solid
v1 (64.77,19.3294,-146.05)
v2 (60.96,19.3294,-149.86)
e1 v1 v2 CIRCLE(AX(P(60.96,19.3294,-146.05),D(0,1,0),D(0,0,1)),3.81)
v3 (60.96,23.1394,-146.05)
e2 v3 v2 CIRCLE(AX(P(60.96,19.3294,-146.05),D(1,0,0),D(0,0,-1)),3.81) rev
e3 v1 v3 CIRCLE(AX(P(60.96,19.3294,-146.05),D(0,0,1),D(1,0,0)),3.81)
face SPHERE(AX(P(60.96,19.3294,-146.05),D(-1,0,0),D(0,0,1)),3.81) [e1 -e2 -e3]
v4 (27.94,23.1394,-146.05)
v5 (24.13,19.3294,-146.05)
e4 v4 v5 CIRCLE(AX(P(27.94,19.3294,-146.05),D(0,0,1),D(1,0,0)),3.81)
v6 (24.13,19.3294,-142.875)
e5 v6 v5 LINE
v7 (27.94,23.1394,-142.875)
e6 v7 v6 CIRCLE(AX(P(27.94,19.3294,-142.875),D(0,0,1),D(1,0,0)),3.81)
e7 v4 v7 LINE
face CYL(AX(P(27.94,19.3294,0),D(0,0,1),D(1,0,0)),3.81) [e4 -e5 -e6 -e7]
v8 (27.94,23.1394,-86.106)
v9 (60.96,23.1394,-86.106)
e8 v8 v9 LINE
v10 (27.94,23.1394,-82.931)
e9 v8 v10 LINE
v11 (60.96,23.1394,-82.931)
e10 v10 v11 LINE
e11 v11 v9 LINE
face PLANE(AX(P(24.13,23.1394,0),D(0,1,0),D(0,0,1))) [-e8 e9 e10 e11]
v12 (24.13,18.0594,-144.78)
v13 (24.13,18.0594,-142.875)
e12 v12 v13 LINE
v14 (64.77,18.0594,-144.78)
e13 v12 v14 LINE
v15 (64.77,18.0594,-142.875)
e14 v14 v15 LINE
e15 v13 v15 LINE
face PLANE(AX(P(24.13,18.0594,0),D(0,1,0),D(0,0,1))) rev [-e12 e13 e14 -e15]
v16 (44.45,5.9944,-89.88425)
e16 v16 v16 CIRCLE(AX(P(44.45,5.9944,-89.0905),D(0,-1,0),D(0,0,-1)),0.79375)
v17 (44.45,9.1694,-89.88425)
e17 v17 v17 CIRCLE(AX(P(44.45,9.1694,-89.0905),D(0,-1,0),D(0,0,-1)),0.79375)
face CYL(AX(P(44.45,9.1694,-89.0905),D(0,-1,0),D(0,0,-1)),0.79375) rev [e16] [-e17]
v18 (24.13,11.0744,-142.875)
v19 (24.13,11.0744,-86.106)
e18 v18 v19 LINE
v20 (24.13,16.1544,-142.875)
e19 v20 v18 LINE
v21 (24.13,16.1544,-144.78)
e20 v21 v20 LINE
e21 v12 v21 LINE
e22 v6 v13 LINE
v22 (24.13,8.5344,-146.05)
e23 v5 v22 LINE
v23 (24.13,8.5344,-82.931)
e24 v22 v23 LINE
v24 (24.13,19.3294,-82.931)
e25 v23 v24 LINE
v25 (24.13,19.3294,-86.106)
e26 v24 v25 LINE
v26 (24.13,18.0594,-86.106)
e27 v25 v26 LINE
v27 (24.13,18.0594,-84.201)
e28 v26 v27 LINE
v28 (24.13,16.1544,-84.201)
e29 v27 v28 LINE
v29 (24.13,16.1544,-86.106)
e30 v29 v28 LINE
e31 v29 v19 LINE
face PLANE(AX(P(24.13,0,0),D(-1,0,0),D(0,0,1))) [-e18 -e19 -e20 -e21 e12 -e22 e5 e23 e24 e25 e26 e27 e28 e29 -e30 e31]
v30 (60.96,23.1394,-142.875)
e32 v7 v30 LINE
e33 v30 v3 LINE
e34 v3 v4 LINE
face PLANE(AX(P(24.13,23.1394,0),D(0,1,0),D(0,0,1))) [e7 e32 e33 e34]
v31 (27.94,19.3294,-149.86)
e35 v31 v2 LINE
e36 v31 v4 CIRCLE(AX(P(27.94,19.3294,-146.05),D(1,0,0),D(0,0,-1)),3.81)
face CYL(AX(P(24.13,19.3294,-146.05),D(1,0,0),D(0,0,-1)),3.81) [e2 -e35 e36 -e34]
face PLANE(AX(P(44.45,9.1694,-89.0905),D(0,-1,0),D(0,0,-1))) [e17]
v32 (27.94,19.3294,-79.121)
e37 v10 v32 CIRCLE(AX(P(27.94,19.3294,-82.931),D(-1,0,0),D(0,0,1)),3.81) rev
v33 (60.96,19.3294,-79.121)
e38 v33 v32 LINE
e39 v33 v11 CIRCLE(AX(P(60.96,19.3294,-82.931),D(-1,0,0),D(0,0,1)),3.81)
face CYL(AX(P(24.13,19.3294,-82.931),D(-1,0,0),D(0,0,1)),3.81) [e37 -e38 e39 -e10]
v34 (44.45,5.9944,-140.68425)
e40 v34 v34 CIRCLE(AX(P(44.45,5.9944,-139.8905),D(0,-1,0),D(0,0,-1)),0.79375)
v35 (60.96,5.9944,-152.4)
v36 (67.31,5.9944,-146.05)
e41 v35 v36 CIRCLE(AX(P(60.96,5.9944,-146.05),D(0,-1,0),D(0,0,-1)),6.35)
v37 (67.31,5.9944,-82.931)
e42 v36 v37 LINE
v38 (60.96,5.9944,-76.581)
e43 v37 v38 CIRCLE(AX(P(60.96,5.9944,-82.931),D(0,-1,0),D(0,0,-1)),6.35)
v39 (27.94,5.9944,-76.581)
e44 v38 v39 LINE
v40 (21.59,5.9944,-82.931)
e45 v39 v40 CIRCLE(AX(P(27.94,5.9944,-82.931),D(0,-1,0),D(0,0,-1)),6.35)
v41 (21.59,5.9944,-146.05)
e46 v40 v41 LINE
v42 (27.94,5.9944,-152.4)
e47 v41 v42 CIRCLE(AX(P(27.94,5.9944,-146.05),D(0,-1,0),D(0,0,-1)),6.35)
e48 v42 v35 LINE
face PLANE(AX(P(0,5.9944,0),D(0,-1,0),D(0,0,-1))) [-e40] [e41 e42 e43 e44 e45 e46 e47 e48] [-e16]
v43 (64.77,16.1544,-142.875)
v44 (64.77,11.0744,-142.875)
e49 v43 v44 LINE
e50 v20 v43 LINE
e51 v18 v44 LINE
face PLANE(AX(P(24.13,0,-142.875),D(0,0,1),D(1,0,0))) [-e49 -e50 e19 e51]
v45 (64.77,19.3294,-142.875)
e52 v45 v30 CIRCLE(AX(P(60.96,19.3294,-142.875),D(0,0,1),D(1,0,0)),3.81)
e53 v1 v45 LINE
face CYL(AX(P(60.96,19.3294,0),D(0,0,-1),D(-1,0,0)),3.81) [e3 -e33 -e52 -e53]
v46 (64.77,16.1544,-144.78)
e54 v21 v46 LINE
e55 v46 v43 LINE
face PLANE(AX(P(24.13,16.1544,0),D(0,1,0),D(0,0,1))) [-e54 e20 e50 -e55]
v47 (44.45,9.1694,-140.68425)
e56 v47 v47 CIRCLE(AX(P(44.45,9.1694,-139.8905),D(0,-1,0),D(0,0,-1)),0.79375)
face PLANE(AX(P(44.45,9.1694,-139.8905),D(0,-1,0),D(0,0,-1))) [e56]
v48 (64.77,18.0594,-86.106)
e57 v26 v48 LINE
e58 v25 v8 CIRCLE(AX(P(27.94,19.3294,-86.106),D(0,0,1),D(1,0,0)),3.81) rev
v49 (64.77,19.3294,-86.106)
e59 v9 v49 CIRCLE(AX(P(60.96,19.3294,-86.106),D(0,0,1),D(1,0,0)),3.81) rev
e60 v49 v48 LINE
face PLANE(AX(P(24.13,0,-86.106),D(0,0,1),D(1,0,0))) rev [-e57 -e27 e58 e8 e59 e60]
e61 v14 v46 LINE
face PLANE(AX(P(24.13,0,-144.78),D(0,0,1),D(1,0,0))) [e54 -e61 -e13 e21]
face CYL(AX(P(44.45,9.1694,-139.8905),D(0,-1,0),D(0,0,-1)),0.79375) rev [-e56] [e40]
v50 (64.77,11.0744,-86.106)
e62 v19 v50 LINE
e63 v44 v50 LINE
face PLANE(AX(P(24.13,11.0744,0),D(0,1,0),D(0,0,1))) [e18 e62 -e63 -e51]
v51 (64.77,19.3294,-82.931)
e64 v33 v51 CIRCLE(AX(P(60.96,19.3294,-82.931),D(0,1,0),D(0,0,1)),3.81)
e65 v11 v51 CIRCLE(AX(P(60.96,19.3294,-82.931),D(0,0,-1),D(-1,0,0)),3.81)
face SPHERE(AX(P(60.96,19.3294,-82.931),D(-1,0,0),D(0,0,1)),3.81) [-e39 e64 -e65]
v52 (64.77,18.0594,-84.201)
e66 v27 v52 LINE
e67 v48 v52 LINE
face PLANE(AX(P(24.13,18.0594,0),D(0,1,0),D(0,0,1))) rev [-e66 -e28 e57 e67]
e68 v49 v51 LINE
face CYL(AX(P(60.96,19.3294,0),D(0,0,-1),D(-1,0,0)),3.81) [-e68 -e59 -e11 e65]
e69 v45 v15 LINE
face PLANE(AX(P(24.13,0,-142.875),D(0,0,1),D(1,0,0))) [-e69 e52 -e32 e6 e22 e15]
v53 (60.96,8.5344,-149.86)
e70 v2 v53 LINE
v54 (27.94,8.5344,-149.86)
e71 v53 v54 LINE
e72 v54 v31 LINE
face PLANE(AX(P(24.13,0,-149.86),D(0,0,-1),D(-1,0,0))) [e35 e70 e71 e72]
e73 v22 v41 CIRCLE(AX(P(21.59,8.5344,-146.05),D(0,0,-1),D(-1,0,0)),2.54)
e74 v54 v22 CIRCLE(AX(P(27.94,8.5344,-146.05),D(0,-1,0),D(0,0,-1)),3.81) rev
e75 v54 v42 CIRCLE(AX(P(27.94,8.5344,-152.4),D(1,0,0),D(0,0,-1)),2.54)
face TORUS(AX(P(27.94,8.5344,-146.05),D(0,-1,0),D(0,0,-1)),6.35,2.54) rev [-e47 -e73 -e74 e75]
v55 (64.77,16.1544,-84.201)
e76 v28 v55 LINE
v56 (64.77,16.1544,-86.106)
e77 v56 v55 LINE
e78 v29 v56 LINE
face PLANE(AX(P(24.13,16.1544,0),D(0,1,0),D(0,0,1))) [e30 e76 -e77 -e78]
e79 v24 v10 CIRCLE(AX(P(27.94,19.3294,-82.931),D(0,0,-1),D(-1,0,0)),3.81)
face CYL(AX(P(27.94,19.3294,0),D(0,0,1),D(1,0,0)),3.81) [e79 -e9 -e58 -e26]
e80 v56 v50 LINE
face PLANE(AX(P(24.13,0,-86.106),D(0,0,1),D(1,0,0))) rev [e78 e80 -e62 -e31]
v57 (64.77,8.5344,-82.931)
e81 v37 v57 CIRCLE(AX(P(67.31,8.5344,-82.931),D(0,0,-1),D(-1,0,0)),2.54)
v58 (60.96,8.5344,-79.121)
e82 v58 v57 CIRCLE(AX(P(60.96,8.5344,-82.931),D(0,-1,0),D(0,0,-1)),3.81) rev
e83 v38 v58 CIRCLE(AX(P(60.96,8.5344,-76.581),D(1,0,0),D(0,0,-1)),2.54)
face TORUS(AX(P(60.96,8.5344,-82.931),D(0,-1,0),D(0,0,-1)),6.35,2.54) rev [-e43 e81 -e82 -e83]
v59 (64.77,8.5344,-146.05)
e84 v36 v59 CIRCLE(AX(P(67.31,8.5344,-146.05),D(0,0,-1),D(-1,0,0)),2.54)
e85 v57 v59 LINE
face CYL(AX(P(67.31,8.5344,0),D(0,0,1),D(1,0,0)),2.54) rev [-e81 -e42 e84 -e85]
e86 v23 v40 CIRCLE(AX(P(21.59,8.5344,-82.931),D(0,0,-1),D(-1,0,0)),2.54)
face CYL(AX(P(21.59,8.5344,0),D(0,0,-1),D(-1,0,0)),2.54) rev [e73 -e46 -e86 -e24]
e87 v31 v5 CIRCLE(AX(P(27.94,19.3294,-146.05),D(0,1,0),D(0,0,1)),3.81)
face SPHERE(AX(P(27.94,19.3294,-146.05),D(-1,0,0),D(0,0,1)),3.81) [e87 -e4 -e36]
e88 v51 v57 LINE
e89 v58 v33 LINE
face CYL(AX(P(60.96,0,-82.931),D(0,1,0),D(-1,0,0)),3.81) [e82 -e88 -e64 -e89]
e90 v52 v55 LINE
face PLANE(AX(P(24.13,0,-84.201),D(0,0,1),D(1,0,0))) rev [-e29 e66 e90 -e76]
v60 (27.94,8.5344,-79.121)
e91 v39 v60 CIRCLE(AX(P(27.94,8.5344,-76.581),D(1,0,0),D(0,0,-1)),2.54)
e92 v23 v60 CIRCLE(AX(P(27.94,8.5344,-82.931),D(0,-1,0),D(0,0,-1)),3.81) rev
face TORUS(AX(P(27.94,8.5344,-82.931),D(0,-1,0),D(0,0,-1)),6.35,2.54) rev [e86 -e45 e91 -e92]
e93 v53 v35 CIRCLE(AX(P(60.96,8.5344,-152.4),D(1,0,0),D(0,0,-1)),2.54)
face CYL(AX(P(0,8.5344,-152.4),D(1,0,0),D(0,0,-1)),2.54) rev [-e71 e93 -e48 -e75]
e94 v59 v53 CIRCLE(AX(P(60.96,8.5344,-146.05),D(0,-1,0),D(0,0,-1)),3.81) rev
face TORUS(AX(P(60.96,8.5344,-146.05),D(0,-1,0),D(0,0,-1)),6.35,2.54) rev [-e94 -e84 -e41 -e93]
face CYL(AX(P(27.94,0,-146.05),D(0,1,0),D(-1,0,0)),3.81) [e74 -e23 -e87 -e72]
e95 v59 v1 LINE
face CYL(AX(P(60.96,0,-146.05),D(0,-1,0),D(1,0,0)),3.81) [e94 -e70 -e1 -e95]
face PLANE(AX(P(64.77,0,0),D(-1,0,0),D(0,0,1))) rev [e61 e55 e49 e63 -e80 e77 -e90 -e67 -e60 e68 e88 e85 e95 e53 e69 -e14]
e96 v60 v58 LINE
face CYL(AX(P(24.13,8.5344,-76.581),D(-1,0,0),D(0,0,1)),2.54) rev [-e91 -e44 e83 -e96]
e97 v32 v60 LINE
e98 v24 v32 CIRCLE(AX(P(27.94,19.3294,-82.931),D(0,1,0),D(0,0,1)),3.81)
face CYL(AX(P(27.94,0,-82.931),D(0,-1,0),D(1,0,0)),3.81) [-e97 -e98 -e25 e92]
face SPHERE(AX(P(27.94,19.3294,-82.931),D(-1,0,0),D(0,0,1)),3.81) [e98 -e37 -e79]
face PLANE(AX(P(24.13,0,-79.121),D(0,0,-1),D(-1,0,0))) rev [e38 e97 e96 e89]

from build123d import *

# Parameters (mm, degrees)
SKETCH2_W               = 88.9
SKETCH2_H               = 152.4
BOSS_EXTRUDE1_DEPTH     = 5.9944
CUT_EXTRUDE2_DEPTH      = 177.535840076
CUT_EXTRUDE2_DEPTH_BACK = 177.535840076
SKETCH4_R               = 2.7305
BOSS_EXTRUDE2_DEPTH     = 101.6
FILLET1_R               = 3.81
FILLET2_R               = 2.54
BOSS_EXTRUDE3_DEPTH     = 20.32
FILLET3_R               = 3.81
FILLET6_R               = 3.81
FILLET7_R               = 2.54
CUT_EXTRUDE3_DEPTH      = 204.596488182
CUT_EXTRUDE3_DEPTH_BACK = 204.596488182
SKETCH7_W               = 2.54
SKETCH7_H               = 152.4
SKETCH8_W               = 86.36
SKETCH8_H               = 152.4
CUT_EXTRUDE4_DEPTH      = 5.9944
SKETCH9_R               = 0.79375
CUT_EXTRUDE5_DEPTH      = 3.175


with BuildPart() as part:
    # Sketch2 → Boss-Extrude1 (new body)
    with BuildSketch(Plane(origin=(0, 0, 0), x_dir=(1, 0, 0), z_dir=(0, 1, 0))):
        with Locations((44.45, 76.2)):
            Rectangle(SKETCH2_W, SKETCH2_H)
    extrude(amount=BOSS_EXTRUDE1_DEPTH)

    # Sketch4 → Cut-Extrude2 (cut, two sides: drawn at the far end of the back side and taken through both)
    with BuildSketch(Plane(origin=(0, 5.9944, 0), x_dir=(1, 0, 0), z_dir=(0, 1, 0)).offset(-CUT_EXTRUDE2_DEPTH_BACK)):
        with Locations(Location((45.72, 109.871331367, 0), (0, 0, 270))):
            Circle(SKETCH4_R)
        with Locations(Location((45.72, 33.671331367, 0), (0, 0, 270))):
            Circle(SKETCH4_R)
    extrude(amount=CUT_EXTRUDE2_DEPTH + CUT_EXTRUDE2_DEPTH_BACK, mode=Mode.SUBTRACT)

    # Sketch5 → Boss-Extrude2 (add)
    with BuildSketch(Plane(origin=(0, 5.9944, 0), x_dir=(1, 0, 0), z_dir=(0, 1, 0))):
        Polygon((18.542, 15.748), (12.446, 15.748), (12.446, 2.54), (76.454, 2.54), (76.454, 15.748), (70.358, 15.748), (70.358, 13.208), (71.374, 13.208), (71.374, 11.43), (70.358, 11.43), (70.358, 7.62), (18.542, 7.62), (18.542, 11.43), (17.526, 11.43), (17.526, 13.208), (18.542, 13.208), align=None)
    extrude(amount=BOSS_EXTRUDE2_DEPTH)

    # Fillet1
    fillet1_edges = [part.edges().sort_by_distance(p)[0] for p in [
        (12.446, 56.7944, -15.748),
        (12.446, 56.7944, -2.54),
        (76.454, 56.7944, -2.54),
        (76.454, 56.7944, -15.748),
    ]]
    fillet(fillet1_edges, radius=FILLET1_R)

    # Fillet2
    fillet2_edges = [part.edges().sort_by_distance(p)[0] for p in [
        (71.501, 5.9944, -15.748),
        (44.45, 5.9944, -2.54),
        (12.446, 5.9944, -9.144),
        (17.399, 5.9944, -15.748),
        (76.454, 5.9944, -9.144),
        (13.561923164, 5.9944, -3.655923164),
        (13.561923164, 5.9944, -14.632076836),
        (75.338076836, 5.9944, -3.655923164),
        (75.338076836, 5.9944, -14.632076836),
    ]]
    fillet(fillet2_edges, radius=FILLET2_R - 0.0001)  # a hair under: the kernel refuses the full size

    # Sketch6 → Boss-Extrude3 (add, symmetric)
    with BuildSketch(Plane.ZY.offset(-44.45)):
        Polygon((-149.86, 5.9944), (-79.121, 5.9944), (-79.121, 23.1394), (-86.106, 23.1394), (-86.106, 18.0594), (-84.201, 18.0594), (-84.201, 16.1544), (-86.106, 16.1544), (-86.106, 11.0744), (-142.875, 11.0744), (-142.875, 16.1544), (-144.78, 16.1544), (-144.78, 18.0594), (-142.875, 18.0594), (-142.875, 23.1394), (-149.86, 23.1394), align=None)
    extrude(amount=BOSS_EXTRUDE3_DEPTH, both=True)

    # Fillet3
    fillet3_edges = [part.edges().sort_by_distance(p)[0] for p in [
        (44.45, 23.1394, -149.86),
        (44.45, 23.1394, -79.121),
    ]]
    fillet(fillet3_edges, radius=FILLET3_R)

    # Fillet6
    fillet6_edges = [part.edges().sort_by_distance(p)[0] for p in [
        (24.13, 12.6619, -149.86),
        (64.77, 12.6619, -79.121),
        (24.13, 23.1394, -84.5185),
        (24.13, 12.6619, -79.121),
        (64.77, 23.1394, -84.5185),
        (64.77, 12.6619, -149.86),
        (64.77, 23.1394, -144.4625),
        (64.77, 22.023476836, -148.744076836),
        (64.77, 22.023476836, -80.236923164),
        (24.13, 23.1394, -144.4625),
        (24.13, 22.023476836, -148.744076836),
        (24.13, 22.023476836, -80.236923164),
    ]]
    fillet(fillet6_edges, radius=FILLET6_R)

    # Fillet7
    fillet7_edges = [part.edges().sort_by_distance(p)[0] for p in [
        (24.13, 5.9944, -114.4905),
        (64.77, 5.9944, -114.4905),
        (44.45, 5.9944, -79.121),
        (44.45, 5.9944, -149.86),
        (25.245923164, 5.9944, -80.236923164),
        (63.654076836, 5.9944, -80.236923164),
        (63.654076836, 5.9944, -148.744076836),
        (25.245923164, 5.9944, -148.744076836),
    ]]
    fillet(fillet7_edges, radius=FILLET7_R - 0.0001)  # a hair under: the kernel refuses the full size

    # Sketch7 → Cut-Extrude3 (cut, two sides: drawn at the far end of the back side and taken through both)
    with BuildSketch(Plane(origin=(0, 5.9944, 0), x_dir=(1, 0, 0), z_dir=(0, 1, 0)).offset(-CUT_EXTRUDE3_DEPTH_BACK)):
        with Locations((1.27, 76.2)):
            Rectangle(SKETCH7_W, SKETCH7_H)
    extrude(amount=CUT_EXTRUDE3_DEPTH + CUT_EXTRUDE3_DEPTH_BACK, mode=Mode.SUBTRACT)

    # Sketch8 → Cut-Extrude4 (cut)
    with BuildSketch(Plane.XZ):
        with Locations((45.72, -76.2)):
            Rectangle(SKETCH8_W, SKETCH8_H)
    extrude(amount=-CUT_EXTRUDE4_DEPTH, mode=Mode.SUBTRACT)


with BuildPart() as body_2:
    # of the pieces the cut leaves, the one that is kept (cut_extrude4_keep)
    add(part.part.solids().sort_by_distance((27.94, 8.5343, -149.86))[0])

    # Sketch9 → Cut-Extrude5 (cut)
    with BuildSketch(Plane.XZ.offset(-5.9944)):
        with Locations(Location((44.45, -89.0905, 0), (0, 0, 270))):
            Circle(SKETCH9_R)
        with Locations(Location((44.45, -139.8905, 0), (0, 0, 270))):
            Circle(SKETCH9_R)
    extrude(amount=-CUT_EXTRUDE5_DEPTH, mode=Mode.SUBTRACT)


solid = body_2.part
